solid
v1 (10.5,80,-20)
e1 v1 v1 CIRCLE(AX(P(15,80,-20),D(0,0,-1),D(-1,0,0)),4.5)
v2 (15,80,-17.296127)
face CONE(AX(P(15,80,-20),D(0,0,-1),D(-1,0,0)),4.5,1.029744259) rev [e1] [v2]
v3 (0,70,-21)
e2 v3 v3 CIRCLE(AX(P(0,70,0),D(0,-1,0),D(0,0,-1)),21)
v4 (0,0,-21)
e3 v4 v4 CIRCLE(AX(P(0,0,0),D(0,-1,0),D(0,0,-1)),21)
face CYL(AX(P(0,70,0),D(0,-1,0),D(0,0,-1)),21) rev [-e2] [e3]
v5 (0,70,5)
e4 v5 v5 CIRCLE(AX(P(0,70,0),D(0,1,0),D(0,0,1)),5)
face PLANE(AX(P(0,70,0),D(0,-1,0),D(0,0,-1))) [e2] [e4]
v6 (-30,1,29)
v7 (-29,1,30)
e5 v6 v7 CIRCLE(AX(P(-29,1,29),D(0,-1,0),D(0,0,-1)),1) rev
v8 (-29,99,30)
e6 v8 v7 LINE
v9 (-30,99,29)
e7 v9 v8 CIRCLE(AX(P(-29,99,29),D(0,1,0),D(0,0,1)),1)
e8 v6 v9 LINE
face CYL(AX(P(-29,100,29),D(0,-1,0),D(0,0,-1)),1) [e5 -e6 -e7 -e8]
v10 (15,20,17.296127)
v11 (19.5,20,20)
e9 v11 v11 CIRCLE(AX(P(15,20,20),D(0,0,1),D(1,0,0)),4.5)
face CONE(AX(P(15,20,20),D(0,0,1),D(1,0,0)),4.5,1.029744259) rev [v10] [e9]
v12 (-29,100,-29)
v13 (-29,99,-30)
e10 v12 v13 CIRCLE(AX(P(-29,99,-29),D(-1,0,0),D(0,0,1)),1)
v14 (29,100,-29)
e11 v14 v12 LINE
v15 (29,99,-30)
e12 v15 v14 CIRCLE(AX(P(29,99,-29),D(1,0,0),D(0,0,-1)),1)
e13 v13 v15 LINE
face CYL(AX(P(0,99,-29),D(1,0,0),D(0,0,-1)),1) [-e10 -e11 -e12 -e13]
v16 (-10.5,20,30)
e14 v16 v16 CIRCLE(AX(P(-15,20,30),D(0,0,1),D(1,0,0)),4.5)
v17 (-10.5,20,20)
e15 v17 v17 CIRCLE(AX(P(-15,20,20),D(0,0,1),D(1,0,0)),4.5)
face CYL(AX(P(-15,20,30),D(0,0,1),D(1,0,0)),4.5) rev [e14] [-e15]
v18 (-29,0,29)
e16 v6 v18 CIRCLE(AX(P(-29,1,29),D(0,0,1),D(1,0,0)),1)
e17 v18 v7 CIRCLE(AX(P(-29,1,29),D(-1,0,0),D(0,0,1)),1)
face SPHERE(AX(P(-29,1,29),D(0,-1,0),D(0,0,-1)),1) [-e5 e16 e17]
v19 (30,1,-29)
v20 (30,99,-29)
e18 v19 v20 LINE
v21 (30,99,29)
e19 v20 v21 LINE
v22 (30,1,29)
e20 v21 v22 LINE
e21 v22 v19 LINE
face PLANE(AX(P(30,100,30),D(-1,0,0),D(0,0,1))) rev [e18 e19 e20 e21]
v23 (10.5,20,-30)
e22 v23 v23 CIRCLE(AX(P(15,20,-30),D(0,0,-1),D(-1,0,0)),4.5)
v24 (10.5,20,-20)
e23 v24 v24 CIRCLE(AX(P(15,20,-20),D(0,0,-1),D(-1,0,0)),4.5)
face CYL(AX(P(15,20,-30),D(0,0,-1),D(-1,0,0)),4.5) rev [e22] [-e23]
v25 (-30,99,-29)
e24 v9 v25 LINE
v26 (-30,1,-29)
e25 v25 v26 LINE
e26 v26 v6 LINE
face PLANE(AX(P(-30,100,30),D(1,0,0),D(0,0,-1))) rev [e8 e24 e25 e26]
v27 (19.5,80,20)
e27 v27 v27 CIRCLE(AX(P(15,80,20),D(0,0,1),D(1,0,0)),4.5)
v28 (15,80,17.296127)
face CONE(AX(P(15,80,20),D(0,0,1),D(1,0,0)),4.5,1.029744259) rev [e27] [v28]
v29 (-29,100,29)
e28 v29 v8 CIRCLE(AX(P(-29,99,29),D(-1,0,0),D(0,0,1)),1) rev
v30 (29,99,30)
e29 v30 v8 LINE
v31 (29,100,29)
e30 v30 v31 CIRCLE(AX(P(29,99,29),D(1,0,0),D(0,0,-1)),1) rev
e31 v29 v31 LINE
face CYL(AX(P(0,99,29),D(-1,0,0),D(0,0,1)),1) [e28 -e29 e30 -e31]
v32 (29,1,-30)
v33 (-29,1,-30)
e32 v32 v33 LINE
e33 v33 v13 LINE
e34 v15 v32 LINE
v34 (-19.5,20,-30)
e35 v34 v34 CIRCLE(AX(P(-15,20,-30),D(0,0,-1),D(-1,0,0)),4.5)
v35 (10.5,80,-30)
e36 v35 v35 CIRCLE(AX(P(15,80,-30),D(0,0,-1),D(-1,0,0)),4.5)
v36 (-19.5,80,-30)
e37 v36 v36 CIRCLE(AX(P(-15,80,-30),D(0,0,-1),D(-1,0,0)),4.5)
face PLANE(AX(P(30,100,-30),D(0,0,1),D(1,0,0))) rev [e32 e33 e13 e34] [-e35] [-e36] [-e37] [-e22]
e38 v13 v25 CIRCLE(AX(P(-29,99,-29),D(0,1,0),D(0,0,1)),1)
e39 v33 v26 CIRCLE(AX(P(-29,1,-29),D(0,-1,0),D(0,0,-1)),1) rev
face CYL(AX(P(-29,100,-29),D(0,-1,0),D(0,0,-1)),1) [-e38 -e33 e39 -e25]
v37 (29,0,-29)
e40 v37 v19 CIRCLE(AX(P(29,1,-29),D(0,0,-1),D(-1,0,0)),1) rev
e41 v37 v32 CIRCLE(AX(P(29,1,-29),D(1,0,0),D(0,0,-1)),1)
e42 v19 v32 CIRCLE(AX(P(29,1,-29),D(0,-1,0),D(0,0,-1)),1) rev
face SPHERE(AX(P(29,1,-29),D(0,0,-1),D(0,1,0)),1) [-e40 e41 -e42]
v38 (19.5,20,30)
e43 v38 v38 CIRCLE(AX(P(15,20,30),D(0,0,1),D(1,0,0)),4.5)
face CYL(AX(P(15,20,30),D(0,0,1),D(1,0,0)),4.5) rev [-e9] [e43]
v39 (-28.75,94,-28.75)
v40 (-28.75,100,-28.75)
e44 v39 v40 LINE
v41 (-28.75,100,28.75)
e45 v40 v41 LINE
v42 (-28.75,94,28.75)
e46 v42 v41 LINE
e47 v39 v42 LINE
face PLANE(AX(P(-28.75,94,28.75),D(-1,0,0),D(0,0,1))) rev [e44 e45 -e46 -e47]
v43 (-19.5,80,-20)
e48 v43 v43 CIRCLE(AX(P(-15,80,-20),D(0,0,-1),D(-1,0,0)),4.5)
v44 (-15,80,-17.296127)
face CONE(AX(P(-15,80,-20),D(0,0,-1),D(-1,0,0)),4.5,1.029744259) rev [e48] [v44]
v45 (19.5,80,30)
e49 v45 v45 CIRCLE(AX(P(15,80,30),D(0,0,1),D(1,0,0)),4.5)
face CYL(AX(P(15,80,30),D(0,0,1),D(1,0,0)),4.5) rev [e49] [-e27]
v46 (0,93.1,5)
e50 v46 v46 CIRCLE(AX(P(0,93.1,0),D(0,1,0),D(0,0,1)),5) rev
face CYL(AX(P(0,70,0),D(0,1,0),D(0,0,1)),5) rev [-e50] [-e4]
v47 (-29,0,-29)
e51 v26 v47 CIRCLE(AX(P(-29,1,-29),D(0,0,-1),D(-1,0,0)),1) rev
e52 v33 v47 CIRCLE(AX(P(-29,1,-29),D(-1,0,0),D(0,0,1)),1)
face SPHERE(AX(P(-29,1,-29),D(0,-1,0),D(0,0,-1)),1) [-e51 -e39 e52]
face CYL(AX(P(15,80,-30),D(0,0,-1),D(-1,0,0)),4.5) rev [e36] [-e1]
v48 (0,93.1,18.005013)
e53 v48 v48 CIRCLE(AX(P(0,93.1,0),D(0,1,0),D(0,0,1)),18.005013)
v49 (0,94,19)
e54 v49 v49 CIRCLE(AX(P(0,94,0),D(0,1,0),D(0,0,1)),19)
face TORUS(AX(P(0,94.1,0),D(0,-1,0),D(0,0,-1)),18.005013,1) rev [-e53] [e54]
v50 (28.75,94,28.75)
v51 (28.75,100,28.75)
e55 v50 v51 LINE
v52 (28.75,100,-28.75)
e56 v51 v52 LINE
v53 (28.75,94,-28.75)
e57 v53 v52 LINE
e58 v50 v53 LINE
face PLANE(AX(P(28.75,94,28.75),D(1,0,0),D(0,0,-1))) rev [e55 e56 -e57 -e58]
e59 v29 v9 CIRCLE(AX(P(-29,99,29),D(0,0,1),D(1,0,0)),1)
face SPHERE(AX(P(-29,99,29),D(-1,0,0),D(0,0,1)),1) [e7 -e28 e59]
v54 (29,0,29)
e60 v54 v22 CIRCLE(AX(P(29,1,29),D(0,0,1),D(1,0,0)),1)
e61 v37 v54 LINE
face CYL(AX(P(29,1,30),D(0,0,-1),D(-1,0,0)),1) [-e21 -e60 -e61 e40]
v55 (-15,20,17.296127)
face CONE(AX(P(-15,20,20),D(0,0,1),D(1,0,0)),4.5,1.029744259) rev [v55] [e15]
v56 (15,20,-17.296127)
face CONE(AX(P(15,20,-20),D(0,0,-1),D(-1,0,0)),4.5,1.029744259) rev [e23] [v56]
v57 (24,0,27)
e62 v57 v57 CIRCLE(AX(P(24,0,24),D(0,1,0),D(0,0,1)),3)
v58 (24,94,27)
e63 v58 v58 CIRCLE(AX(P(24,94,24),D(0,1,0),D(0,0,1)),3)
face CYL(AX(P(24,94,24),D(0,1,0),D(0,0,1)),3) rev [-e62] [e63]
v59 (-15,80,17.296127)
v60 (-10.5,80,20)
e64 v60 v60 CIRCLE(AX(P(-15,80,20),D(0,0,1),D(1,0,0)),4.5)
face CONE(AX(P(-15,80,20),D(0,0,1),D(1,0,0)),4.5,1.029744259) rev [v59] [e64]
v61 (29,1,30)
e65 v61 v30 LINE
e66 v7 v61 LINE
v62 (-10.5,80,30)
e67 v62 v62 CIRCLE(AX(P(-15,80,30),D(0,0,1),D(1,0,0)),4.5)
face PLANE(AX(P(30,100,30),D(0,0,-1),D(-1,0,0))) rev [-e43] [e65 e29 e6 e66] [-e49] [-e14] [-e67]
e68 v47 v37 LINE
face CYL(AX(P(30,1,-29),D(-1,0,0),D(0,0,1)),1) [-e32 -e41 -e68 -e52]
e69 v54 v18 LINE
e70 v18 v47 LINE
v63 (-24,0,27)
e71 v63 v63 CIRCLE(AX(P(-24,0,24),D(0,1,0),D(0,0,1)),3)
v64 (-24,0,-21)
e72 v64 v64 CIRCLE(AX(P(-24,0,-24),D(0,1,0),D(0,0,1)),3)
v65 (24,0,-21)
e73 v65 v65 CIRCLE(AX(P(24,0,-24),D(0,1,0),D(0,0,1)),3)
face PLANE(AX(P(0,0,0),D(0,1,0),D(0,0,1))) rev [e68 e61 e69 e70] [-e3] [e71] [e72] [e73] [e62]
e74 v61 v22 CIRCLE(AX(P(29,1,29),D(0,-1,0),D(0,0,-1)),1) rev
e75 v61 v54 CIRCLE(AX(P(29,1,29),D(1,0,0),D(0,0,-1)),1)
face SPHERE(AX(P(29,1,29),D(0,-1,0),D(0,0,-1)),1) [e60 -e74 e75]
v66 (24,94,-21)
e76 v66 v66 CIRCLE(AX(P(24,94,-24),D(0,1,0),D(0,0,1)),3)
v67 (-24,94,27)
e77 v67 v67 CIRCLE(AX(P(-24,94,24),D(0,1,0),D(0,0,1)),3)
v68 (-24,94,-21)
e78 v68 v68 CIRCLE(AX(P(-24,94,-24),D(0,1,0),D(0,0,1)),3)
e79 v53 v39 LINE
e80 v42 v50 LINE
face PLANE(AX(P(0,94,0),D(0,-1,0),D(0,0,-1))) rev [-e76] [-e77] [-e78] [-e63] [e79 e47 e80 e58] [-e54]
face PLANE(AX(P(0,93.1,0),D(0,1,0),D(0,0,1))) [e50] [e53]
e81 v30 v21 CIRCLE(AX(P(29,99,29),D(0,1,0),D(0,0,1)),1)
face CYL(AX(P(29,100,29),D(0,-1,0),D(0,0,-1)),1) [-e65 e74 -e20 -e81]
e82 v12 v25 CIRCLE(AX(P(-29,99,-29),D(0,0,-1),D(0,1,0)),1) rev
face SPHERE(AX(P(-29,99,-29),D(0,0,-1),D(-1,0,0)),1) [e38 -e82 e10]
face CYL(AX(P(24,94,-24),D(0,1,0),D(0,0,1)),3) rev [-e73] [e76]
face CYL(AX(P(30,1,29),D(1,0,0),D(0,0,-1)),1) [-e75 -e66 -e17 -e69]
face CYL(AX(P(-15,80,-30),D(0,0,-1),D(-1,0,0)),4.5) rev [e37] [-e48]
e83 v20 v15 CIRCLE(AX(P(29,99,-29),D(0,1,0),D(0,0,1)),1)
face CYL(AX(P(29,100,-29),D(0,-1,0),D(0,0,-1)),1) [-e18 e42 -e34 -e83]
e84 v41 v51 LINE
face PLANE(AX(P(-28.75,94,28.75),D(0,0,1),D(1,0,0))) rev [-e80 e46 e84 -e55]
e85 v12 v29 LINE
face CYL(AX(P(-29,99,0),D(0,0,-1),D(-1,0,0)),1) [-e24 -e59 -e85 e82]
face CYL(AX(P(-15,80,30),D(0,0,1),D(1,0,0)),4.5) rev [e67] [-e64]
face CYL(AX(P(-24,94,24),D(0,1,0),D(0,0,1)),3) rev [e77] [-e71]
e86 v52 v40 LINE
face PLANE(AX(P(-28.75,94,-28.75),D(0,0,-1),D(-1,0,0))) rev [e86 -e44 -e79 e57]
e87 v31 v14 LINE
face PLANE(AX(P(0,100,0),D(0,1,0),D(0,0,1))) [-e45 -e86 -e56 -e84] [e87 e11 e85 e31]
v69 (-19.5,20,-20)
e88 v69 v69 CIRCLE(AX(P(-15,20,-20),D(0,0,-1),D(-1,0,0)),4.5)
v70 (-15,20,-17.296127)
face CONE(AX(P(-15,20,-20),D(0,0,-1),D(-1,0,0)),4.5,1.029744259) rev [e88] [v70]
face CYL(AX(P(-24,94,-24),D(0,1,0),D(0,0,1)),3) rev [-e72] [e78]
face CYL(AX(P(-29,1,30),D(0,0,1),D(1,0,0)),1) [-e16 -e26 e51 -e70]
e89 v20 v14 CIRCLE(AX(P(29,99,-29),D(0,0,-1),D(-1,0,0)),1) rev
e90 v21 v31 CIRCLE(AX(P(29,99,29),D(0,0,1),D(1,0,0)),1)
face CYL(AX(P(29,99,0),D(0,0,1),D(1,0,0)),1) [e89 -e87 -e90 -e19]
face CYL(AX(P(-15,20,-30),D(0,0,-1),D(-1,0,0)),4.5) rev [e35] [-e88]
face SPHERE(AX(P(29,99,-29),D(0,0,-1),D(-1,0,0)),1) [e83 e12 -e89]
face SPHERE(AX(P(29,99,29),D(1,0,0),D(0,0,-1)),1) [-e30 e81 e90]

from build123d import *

# Parameters (mm, degrees)
SZKIC1_W                     = 60
SZKIC1_H                     = 60
DODANIE_WYCI_GNI_CIE1_DEPTH  = 100
SZKIC2_W                     = 57.5
SZKIC2_H                     = 57.5
WYTNIJ_WYCI_GNI_CIE1_DEPTH   = 6
SZKIC3_R                     = 5
WYTNIJ_WYCI_GNI_CIE2_DEPTH   = 24
SZKIC4_R                     = 19
WYTNIJ_WYCI_GNI_CIE3_DEPTH   = 0.9
ZAOKR_GLENIE1_R              = 1
OTWORY_USTALAJ_CE_6_0MM1_D   = 6
SZKIC8_R                     = 21
WYTNIJ_WYCI_GNI_CIE5_DEPTH   = 70
ZAOKR_GLENIE2_R              = 1
OTW_R_POD_RUB_M81_AT_2_COUNT = 2
OTW_R_POD_RUB_M81_AT_2_PITCH = 30
OTW_R_POD_RUB_M81_AT_3_COUNT = 2
OTW_R_POD_RUB_M81_AT_3_PITCH = 67.082039325
OTW_R_POD_RUB_M81_AT_4_COUNT = 2
OTW_R_POD_RUB_M81_AT_4_PITCH = 60


with BuildPart() as part:
    # Szkic1 → Dodanie-wyciągnięcie1 (new body)
    with BuildSketch(Plane(origin=(0, 0, 0), x_dir=(1, 0, 0), z_dir=(0, 1, 0))):
        Rectangle(SZKIC1_W, SZKIC1_H)
    extrude(amount=DODANIE_WYCI_GNI_CIE1_DEPTH)

    # Szkic2 → Wytnij-wyciągnięcie1 (cut)
    with BuildSketch(Plane(origin=(0, 100, 0), x_dir=(1, 0, 0), z_dir=(0, 1, 0))):
        Rectangle(SZKIC2_W, SZKIC2_H)
    extrude(amount=-WYTNIJ_WYCI_GNI_CIE1_DEPTH, mode=Mode.SUBTRACT)

    # Szkic3 → Wytnij-wyciągnięcie2 (cut)
    with BuildSketch(Plane(origin=(0, 94, 0), x_dir=(1, 0, 0), z_dir=(0, 1, 0))):
        with Locations(Location((0, 0, 0), (0, 0, 270))):
            Circle(SZKIC3_R)
    extrude(amount=-WYTNIJ_WYCI_GNI_CIE2_DEPTH, mode=Mode.SUBTRACT)

    # Szkic4 → Wytnij-wyciągnięcie3 (cut)
    with BuildSketch(Plane(origin=(0, 94, 0), x_dir=(1, 0, 0), z_dir=(0, 1, 0))):
        with Locations(Location((0, 0, 0), (0, 0, 270))):
            Circle(SZKIC4_R)
    extrude(amount=-WYTNIJ_WYCI_GNI_CIE3_DEPTH, mode=Mode.SUBTRACT)

    # Zaokrąglenie1
    # the kernel refuses this fillet: 1 mm, written as the material it adds along each edge
    with BuildSketch(Plane(origin=(0, 93.1, 0), x_dir=(0, 0, 1), z_dir=(-1, 0, 0))) as zaokr_glenie1_piece_1:
        with BuildLine():
            CenterArc((18.005012563, 1), ZAOKR_GLENIE1_R, 270, 84.260829523)
            Line((18.005012563, 0), (18.005012563, -0.02))
            Line((18.005012563, -0.02), (19, -0.02))
            Line((19, -0.02), (19.02, 0))
            ThreePointArc((19.02, 0), (19.02, 0.45), (19.019899749, 0.898))
            Line((19.019899749, 0.898), (19, 0.9))
        make_face()
    revolve(axis=Axis((0, 93.1, 0), (0, 1, 0)))

    # Otwory ustalające Ø6.0mm1 (through all)
    with Locations(Plane(origin=(0, 94, 0), x_dir=(1, 0, 0), z_dir=(0, 1, 0))):
        with Locations((-24, 24), (24, 24), (24, -24), (-24, -24)):
            Hole(OTWORY_USTALAJ_CE_6_0MM1_D / 2)

    # Szkic8 → Wytnij-wyciągnięcie5 (cut)
    with BuildSketch(Plane.XZ):
        with Locations(Location((0, 0, 0), (0, 0, 270))):
            Circle(SZKIC8_R)
    extrude(amount=-WYTNIJ_WYCI_GNI_CIE5_DEPTH, mode=Mode.SUBTRACT)

    # Zaokrąglenie2
    zaokr_glenie2_edges = [part.edges().sort_by_distance(p)[0] for p in [
        (30, 100, 0),
        (0, 100, -30),
        (-30, 100, 0),
        (0, 0, -30),
        (30, 0, 0),
        (0, 0, 30),
        (-30, 0, 0),
        (-30, 50, -30),
        (30, 50, -30),
        (30, 50, 30),
        (-30, 50, 30),
        (0, 100, 30),
    ]]
    fillet(zaokr_glenie2_edges, radius=ZAOKR_GLENIE2_R)

    # Szkic11 → Otwór pod śrubę M81 (revolve, cut)
    with BuildSketch(Plane(origin=(15, 80, -30), x_dir=(0, 1, 0), z_dir=(1, 0, 0))):
        Polygon((0, 0), (0, 12.703872786), (4.5, 10), (4.5, 0), align=None)
    otw_r_pod_rub_m81 = revolve(axis=Axis((15, 80, -36.35), (0, 0, 1)), mode=Mode.SUBTRACT)

    # Otwór pod śrubę M81 at 2: Otwór pod śrubę M81 ×2
    with Locations(*[(-i * OTW_R_POD_RUB_M81_AT_2_PITCH, 0, 0) for i in range(1, OTW_R_POD_RUB_M81_AT_2_COUNT)]):
        add(otw_r_pod_rub_m81, mode=Mode.SUBTRACT)

    # Otwór pod śrubę M81 at 3: Otwór pod śrubę M81 ×2
    with Locations(*[Vector(-0.4472135954999577, -0.894427190999916, 0) * (i * OTW_R_POD_RUB_M81_AT_3_PITCH) for i in range(1, OTW_R_POD_RUB_M81_AT_3_COUNT)]):
        add(otw_r_pod_rub_m81, mode=Mode.SUBTRACT)

    # Otwór pod śrubę M81 at 4: Otwór pod śrubę M81 ×2
    with Locations(*[(0, -i * OTW_R_POD_RUB_M81_AT_4_PITCH, 0) for i in range(1, OTW_R_POD_RUB_M81_AT_4_COUNT)]):
        add(otw_r_pod_rub_m81, mode=Mode.SUBTRACT)

    # Lustro1: Otwór pod śrubę M81 across plane
    add(otw_r_pod_rub_m81.mirror(Plane.XY), mode=Mode.SUBTRACT)

    # Lustro1 copy 1 sketch → Lustro1 copy 1 (revolve, cut)
    with BuildSketch(Plane(origin=(-15, 80, 30), x_dir=(0, 1, 0), z_dir=(1, 0, 0))):
        Polygon((0, 0), (0, -12.703872786), (4.5, -10), (4.5, 0), align=None)
    revolve(axis=Axis((-15, 80, 36.35), (0, 0, 1)), mode=Mode.SUBTRACT)

    # Lustro1 copy 2 sketch → Lustro1 copy 2 (revolve, cut)
    with BuildSketch(Plane(origin=(-15, 20, 30), x_dir=(0, 1, 0), z_dir=(1, 0, 0))):
        Polygon((0, 0), (0, -12.703872786), (4.5, -10), (4.5, 0), align=None)
    revolve(axis=Axis((-15, 20, 36.35), (0, 0, 1)), mode=Mode.SUBTRACT)

    # Lustro1 copy 3 sketch → Lustro1 copy 3 (revolve, cut)
    with BuildSketch(Plane(origin=(15, 20, 30), x_dir=(0, 1, 0), z_dir=(1, 0, 0))):
        Polygon((0, 0), (0, -12.703872786), (4.5, -10), (4.5, 0), align=None)
    revolve(axis=Axis((15, 20, 36.35), (0, 0, 1)), mode=Mode.SUBTRACT)


solid = part.part
